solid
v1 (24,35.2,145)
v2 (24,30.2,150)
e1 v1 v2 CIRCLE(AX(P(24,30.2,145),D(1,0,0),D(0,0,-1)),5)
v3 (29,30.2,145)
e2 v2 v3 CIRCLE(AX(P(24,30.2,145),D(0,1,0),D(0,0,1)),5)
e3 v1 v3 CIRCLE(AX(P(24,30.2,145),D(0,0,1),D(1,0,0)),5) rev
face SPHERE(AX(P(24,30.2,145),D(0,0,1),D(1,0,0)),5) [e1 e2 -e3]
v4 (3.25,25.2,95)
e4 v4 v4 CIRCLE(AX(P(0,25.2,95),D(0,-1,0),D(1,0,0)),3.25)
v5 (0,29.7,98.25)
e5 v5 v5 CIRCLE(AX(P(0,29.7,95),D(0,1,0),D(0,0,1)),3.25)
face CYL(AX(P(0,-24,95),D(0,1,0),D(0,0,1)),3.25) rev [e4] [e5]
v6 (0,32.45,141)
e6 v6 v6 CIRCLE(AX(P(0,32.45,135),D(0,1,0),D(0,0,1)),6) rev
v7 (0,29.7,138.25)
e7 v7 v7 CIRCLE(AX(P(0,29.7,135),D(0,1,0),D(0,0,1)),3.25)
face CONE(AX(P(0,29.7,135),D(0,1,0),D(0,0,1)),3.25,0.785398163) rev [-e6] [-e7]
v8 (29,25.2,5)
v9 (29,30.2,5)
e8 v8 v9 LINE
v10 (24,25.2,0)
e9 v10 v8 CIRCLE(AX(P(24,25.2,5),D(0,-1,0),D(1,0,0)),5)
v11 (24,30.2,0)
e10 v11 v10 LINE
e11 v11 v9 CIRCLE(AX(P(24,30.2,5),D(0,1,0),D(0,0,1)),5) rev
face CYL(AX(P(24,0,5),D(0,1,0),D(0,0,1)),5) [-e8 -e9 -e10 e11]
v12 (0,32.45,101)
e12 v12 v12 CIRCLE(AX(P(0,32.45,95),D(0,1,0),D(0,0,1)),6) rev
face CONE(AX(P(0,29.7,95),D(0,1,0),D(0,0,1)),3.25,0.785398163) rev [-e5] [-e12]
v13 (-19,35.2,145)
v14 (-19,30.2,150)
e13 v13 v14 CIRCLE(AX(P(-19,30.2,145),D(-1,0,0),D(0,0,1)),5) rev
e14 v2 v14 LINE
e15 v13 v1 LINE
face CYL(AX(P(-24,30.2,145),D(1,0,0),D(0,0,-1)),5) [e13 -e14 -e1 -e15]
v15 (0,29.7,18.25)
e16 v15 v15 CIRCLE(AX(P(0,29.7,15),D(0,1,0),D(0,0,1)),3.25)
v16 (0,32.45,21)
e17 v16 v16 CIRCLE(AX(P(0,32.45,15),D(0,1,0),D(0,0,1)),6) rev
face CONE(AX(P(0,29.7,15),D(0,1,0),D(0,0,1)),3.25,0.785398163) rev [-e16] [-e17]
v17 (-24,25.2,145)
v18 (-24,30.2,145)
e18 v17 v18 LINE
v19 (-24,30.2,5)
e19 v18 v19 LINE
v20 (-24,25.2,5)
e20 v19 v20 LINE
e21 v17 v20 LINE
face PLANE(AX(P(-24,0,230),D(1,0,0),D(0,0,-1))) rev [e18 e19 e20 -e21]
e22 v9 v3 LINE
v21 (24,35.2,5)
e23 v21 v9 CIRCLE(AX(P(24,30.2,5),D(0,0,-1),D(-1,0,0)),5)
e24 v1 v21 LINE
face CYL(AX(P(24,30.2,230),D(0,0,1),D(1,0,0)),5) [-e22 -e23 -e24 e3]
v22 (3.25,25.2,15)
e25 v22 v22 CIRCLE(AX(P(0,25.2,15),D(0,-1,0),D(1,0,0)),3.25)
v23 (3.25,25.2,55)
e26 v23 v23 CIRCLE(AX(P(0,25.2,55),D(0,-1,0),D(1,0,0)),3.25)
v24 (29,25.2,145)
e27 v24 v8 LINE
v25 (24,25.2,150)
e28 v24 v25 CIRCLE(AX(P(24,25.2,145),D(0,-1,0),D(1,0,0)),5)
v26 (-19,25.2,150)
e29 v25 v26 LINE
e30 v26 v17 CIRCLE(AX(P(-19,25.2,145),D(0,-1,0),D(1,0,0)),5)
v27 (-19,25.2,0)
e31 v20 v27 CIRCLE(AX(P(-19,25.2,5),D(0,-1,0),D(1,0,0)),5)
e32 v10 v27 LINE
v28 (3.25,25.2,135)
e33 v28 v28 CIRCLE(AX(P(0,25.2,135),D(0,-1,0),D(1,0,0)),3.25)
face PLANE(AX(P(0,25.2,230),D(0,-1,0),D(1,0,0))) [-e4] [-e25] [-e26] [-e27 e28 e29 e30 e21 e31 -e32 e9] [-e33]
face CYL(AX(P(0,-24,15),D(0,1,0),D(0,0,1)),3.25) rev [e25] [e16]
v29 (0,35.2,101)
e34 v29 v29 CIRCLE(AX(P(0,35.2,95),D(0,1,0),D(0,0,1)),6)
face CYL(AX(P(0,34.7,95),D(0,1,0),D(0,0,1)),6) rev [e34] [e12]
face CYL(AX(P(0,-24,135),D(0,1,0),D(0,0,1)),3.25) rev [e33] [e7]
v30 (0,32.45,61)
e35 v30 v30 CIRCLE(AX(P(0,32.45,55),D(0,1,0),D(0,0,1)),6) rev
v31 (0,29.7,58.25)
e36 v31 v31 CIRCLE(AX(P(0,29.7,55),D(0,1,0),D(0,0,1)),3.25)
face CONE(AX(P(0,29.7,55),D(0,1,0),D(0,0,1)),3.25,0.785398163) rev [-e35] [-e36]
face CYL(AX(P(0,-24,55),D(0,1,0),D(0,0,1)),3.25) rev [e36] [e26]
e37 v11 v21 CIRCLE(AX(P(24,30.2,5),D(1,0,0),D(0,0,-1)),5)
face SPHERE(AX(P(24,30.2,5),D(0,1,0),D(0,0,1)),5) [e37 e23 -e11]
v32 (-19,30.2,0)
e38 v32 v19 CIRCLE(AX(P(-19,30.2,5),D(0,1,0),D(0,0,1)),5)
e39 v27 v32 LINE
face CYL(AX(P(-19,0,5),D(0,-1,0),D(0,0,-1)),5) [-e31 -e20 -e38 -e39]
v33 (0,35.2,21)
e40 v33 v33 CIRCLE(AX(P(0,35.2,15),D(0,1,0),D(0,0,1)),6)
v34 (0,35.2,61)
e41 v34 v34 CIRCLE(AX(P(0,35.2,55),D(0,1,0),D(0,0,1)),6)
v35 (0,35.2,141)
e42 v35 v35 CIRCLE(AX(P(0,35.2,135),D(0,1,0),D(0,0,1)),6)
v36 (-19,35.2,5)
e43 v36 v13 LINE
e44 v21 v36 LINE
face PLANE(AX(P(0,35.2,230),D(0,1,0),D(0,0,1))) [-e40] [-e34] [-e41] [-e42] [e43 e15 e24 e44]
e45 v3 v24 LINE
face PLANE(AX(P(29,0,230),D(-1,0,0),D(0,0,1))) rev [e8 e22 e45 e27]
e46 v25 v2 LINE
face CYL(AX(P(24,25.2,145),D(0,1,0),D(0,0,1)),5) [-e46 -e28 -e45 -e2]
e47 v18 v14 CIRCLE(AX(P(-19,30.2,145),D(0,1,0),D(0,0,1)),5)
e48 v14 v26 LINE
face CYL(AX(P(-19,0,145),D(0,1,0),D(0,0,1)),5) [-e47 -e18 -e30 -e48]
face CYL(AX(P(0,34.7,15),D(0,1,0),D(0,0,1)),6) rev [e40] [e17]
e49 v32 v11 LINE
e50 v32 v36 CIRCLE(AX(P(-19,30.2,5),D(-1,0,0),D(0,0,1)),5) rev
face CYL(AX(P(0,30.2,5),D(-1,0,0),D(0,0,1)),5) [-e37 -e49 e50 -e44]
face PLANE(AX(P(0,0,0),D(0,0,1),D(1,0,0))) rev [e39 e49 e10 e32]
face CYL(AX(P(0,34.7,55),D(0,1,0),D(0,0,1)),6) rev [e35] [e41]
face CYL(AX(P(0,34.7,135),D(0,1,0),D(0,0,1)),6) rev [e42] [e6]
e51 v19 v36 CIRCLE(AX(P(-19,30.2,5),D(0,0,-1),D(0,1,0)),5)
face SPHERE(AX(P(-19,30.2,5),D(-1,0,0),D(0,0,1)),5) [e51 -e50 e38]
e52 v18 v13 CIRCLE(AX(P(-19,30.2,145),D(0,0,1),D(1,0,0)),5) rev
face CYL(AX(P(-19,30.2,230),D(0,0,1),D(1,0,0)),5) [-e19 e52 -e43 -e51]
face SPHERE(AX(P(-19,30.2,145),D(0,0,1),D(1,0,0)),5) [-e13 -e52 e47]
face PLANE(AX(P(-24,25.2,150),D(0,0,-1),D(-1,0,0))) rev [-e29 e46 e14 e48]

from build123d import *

# Parameters (mm, degrees)
SKETCH1_W               = 48
SKETCH1_H               = 48
SKETCH1_R               = 13.75
SKETCH1_H_2             = 10
BOSS_EXTRUDE1_DEPTH     = 230
SKETCH3_R               = 6
CUT_EXTRUDE1_DEPTH      = 0.5
SKETCH4_R               = 3.25
CUT_EXTRUDE2_DEPTH      = 240.26061105
CUT_EXTRUDE3_REACH      = 241.261
CUT_EXTRUDE3_END_RADIUS = 13.75
SKETCH5_R               = 6.5
CUT_EXTRUDE4_REACH      = 243.738
CUT_EXTRUDE4_END_RADIUS = 13.75
CUT_EXTRUDE4_START      = -5
CHAMFER1_SIZE           = 5
SKETCH8_W               = 230
SKETCH8_H               = 1.2
CUT_EXTRUDE5_DEPTH      = 10
SKETCH9_W               = 53
SKETCH9_H               = 80
CUT_EXTRUDE6_DEPTH      = 233.036635039
FILLET2_R               = 5


with BuildPart() as part:
    # Sketch1 → Boss-Extrude1 (new body)
    # profile 1 of 3: a face of its own
    with BuildSketch(Plane.XY):
        Rectangle(SKETCH1_W, SKETCH1_H)
        Circle(SKETCH1_R, mode=Mode.SUBTRACT)
    # profile 2 of 3: a face of its own
    with BuildSketch(Plane.XY):
        with Locations((0, 30.2)):
            Rectangle(SKETCH1_W, SKETCH1_H_2)
    # profile 3 of 3: a face of its own
    with BuildSketch(Plane.XY):
        Polygon((24, 24), (24, -24), (29, -24), (29, 35.2), (24, 35.2), (24, 25.2), align=None)
    extrude(amount=BOSS_EXTRUDE1_DEPTH)

    # Sketch3 → Cut-Extrude1 (cut)
    with BuildSketch(Plane(origin=(0, 35.2, 0), x_dir=(1, 0, 0), z_dir=(0, 1, 0))):
        with Locations(Location((0, -15, 0), (0, 0, 270))):
            Circle(SKETCH3_R)
        with Locations(Location((0, -55, 0), (0, 0, 270))):
            Circle(SKETCH3_R)
        with Locations(Location((0, -95, 0), (0, 0, 270))):
            Circle(SKETCH3_R)
        with Locations(Location((0, -135, 0), (0, 0, 270))):
            Circle(SKETCH3_R)
        with Locations(Location((0, -175, 0), (0, 0, 270))):
            Circle(SKETCH3_R)
        with Locations(Location((0, -215, 0), (0, 0, 270))):
            Circle(SKETCH3_R)
    extrude(amount=-CUT_EXTRUDE1_DEPTH, mode=Mode.SUBTRACT)

    # Sketch4 → Cut-Extrude2 (cut, through all)
    with BuildSketch(Plane(origin=(0, 35.2, 0), x_dir=(1, 0, 0), z_dir=(0, 1, 0))):
        with Locations(Location((0, -15, 0), (0, 0, 270))):
            Circle(SKETCH4_R)
        with Locations(Location((0, -55, 0), (0, 0, 270))):
            Circle(SKETCH4_R)
        with Locations(Location((0, -95, 0), (0, 0, 270))):
            Circle(SKETCH4_R)
        with Locations(Location((0, -135, 0), (0, 0, 270))):
            Circle(SKETCH4_R)
        with Locations(Location((0, -175, 0), (0, 0, 270))):
            Circle(SKETCH4_R)
        with Locations(Location((0, -215, 0), (0, 0, 270))):
            Circle(SKETCH4_R)
    extrude(amount=-CUT_EXTRUDE2_DEPTH, mode=Mode.SUBTRACT)

    # Cut-Extrude3: up to this cylinder (the profile starts outside it)
    cut_extrude3_end = Plane(origin=(0, 0, 115), z_dir=(0, 0, -1)) * Cylinder(CUT_EXTRUDE3_END_RADIUS, 711.022, mode=Mode.PRIVATE)
    # Sketch5 → Cut-Extrude3 (cut, up to the surface)
    with BuildSketch(Plane.XZ.offset(24), mode=Mode.PRIVATE) as cut_extrude3_sk1:
        with Locations(Location((0, 215, 0), (0, 0, 270))):
            Circle(SKETCH5_R)
    cut_extrude3_tool1 = extrude(cut_extrude3_sk1.sketch, amount=-CUT_EXTRUDE3_REACH, mode=Mode.PRIVATE) - cut_extrude3_end
    add(cut_extrude3_tool1.solids().sort_by_distance((0, -24, 215))[0], mode=Mode.SUBTRACT)
    # Sketch5 → Cut-Extrude3 (cut, up to the surface)
    with BuildSketch(Plane.XZ.offset(24), mode=Mode.PRIVATE) as cut_extrude3_sk2:
        with Locations(Location((0, 175, 0), (0, 0, 270))):
            Circle(SKETCH5_R)
    cut_extrude3_tool2 = extrude(cut_extrude3_sk2.sketch, amount=-CUT_EXTRUDE3_REACH, mode=Mode.PRIVATE) - cut_extrude3_end
    add(cut_extrude3_tool2.solids().sort_by_distance((0, -24, 175))[0], mode=Mode.SUBTRACT)
    # Sketch5 → Cut-Extrude3 (cut, up to the surface)
    with BuildSketch(Plane.XZ.offset(24), mode=Mode.PRIVATE) as cut_extrude3_sk3:
        with Locations(Location((0, 135, 0), (0, 0, 270))):
            Circle(SKETCH5_R)
    cut_extrude3_tool3 = extrude(cut_extrude3_sk3.sketch, amount=-CUT_EXTRUDE3_REACH, mode=Mode.PRIVATE) - cut_extrude3_end
    add(cut_extrude3_tool3.solids().sort_by_distance((0, -24, 135))[0], mode=Mode.SUBTRACT)
    # Sketch5 → Cut-Extrude3 (cut, up to the surface)
    with BuildSketch(Plane.XZ.offset(24), mode=Mode.PRIVATE) as cut_extrude3_sk4:
        with Locations(Location((0, 95, 0), (0, 0, 270))):
            Circle(SKETCH5_R)
    cut_extrude3_tool4 = extrude(cut_extrude3_sk4.sketch, amount=-CUT_EXTRUDE3_REACH, mode=Mode.PRIVATE) - cut_extrude3_end
    add(cut_extrude3_tool4.solids().sort_by_distance((0, -24, 95))[0], mode=Mode.SUBTRACT)
    # Sketch5 → Cut-Extrude3 (cut, up to the surface)
    with BuildSketch(Plane.XZ.offset(24), mode=Mode.PRIVATE) as cut_extrude3_sk5:
        with Locations(Location((0, 55, 0), (0, 0, 270))):
            Circle(SKETCH5_R)
    cut_extrude3_tool5 = extrude(cut_extrude3_sk5.sketch, amount=-CUT_EXTRUDE3_REACH, mode=Mode.PRIVATE) - cut_extrude3_end
    add(cut_extrude3_tool5.solids().sort_by_distance((0, -24, 55))[0], mode=Mode.SUBTRACT)
    # Sketch5 → Cut-Extrude3 (cut, up to the surface)
    with BuildSketch(Plane.XZ.offset(24), mode=Mode.PRIVATE) as cut_extrude3_sk6:
        with Locations(Location((0, 15, 0), (0, 0, 270))):
            Circle(SKETCH5_R)
    cut_extrude3_tool6 = extrude(cut_extrude3_sk6.sketch, amount=-CUT_EXTRUDE3_REACH, mode=Mode.PRIVATE) - cut_extrude3_end
    add(cut_extrude3_tool6.solids().sort_by_distance((0, -24, 15))[0], mode=Mode.SUBTRACT)

    # Cut-Extrude4: up to this cylinder (the profile starts outside it)
    cut_extrude4_end = Plane(origin=(0, 0, 115), z_dir=(0, 0, -1)) * Cylinder(CUT_EXTRUDE4_END_RADIUS, 715.976, mode=Mode.PRIVATE)
    # Sketch7 → Cut-Extrude4 (cut, up to the surface)
    with BuildSketch(Plane(origin=(0, 24, 0), x_dir=(1, 0, 0), z_dir=(0, 1, 0)).offset(CUT_EXTRUDE4_START), mode=Mode.PRIVATE) as cut_extrude4_sk1:
        Polygon((0, -8.533676985), (-5.6, -11.766838493), (-5.6, -18.233161507), (0, -21.466323015), (5.6, -18.233161507), (5.6, -11.766838493), align=None)
    cut_extrude4_tool1 = extrude(cut_extrude4_sk1.sketch, amount=-CUT_EXTRUDE4_REACH, mode=Mode.PRIVATE) - cut_extrude4_end
    add(cut_extrude4_tool1.solids().sort_by_distance((0, 19, 15))[0], mode=Mode.SUBTRACT)
    # Sketch7 → Cut-Extrude4 (cut, up to the surface)
    with BuildSketch(Plane(origin=(0, 24, 0), x_dir=(1, 0, 0), z_dir=(0, 1, 0)).offset(CUT_EXTRUDE4_START), mode=Mode.PRIVATE) as cut_extrude4_sk2:
        Polygon((0, -48.533676985), (-5.6, -51.766838493), (-5.6, -58.233161507), (0, -61.466323015), (5.6, -58.233161507), (5.6, -51.766838493), align=None)
    cut_extrude4_tool2 = extrude(cut_extrude4_sk2.sketch, amount=-CUT_EXTRUDE4_REACH, mode=Mode.PRIVATE) - cut_extrude4_end
    add(cut_extrude4_tool2.solids().sort_by_distance((0, 19, 55))[0], mode=Mode.SUBTRACT)
    # Sketch7 → Cut-Extrude4 (cut, up to the surface)
    with BuildSketch(Plane(origin=(0, 24, 0), x_dir=(1, 0, 0), z_dir=(0, 1, 0)).offset(CUT_EXTRUDE4_START), mode=Mode.PRIVATE) as cut_extrude4_sk3:
        Polygon((0, -88.533676985), (-5.6, -91.766838493), (-5.6, -98.233161507), (0, -101.466323015), (5.6, -98.233161507), (5.6, -91.766838493), align=None)
    cut_extrude4_tool3 = extrude(cut_extrude4_sk3.sketch, amount=-CUT_EXTRUDE4_REACH, mode=Mode.PRIVATE) - cut_extrude4_end
    add(cut_extrude4_tool3.solids().sort_by_distance((0, 19, 95))[0], mode=Mode.SUBTRACT)
    # Sketch7 → Cut-Extrude4 (cut, up to the surface)
    with BuildSketch(Plane(origin=(0, 24, 0), x_dir=(1, 0, 0), z_dir=(0, 1, 0)).offset(CUT_EXTRUDE4_START), mode=Mode.PRIVATE) as cut_extrude4_sk4:
        Polygon((0, -128.533676985), (-5.6, -131.766838493), (-5.6, -138.233161507), (0, -141.466323015), (5.6, -138.233161507), (5.6, -131.766838493), align=None)
    cut_extrude4_tool4 = extrude(cut_extrude4_sk4.sketch, amount=-CUT_EXTRUDE4_REACH, mode=Mode.PRIVATE) - cut_extrude4_end
    add(cut_extrude4_tool4.solids().sort_by_distance((0, 19, 135))[0], mode=Mode.SUBTRACT)
    # Sketch7 → Cut-Extrude4 (cut, up to the surface)
    with BuildSketch(Plane(origin=(0, 24, 0), x_dir=(1, 0, 0), z_dir=(0, 1, 0)).offset(CUT_EXTRUDE4_START), mode=Mode.PRIVATE) as cut_extrude4_sk5:
        Polygon((0, -168.533676985), (-5.6, -171.766838493), (-5.6, -178.233161507), (0, -181.466323015), (5.6, -178.233161507), (5.6, -171.766838493), align=None)
    cut_extrude4_tool5 = extrude(cut_extrude4_sk5.sketch, amount=-CUT_EXTRUDE4_REACH, mode=Mode.PRIVATE) - cut_extrude4_end
    add(cut_extrude4_tool5.solids().sort_by_distance((0, 19, 175))[0], mode=Mode.SUBTRACT)
    # Sketch7 → Cut-Extrude4 (cut, up to the surface)
    with BuildSketch(Plane(origin=(0, 24, 0), x_dir=(1, 0, 0), z_dir=(0, 1, 0)).offset(CUT_EXTRUDE4_START), mode=Mode.PRIVATE) as cut_extrude4_sk6:
        Polygon((0, -208.533676985), (-5.6, -211.766838493), (-5.6, -218.233161507), (0, -221.466323015), (5.6, -218.233161507), (5.6, -211.766838493), align=None)
    cut_extrude4_tool6 = extrude(cut_extrude4_sk6.sketch, amount=-CUT_EXTRUDE4_REACH, mode=Mode.PRIVATE) - cut_extrude4_end
    add(cut_extrude4_tool6.solids().sort_by_distance((0, 19, 215))[0], mode=Mode.SUBTRACT)

    # Chamfer1
    # the kernel refuses this chamfer: 5 mm, written as the material it takes off along each edge
    with BuildSketch(Plane(origin=(0, 34.7, 215), x_dir=(0, 0, 1), z_dir=(-1, 0, 0))) as chamfer1_piece_1_section:
        Polygon((3.25, -CHAMFER1_SIZE), (3.25 + CHAMFER1_SIZE, 0), (3.25, 0), align=None)
    chamfer1_piece_1 = revolve(axis=Axis((0, 34.7, 215), (0, 1, 0)), mode=Mode.PRIVATE)
    chamfer1_piece_1 = chamfer1_piece_1 & Plane(origin=(0, 31.051548399, 215), x_dir=(0, 0, 1), z_dir=(0, 1, 0)) * Cylinder(6, 33, mode=Mode.PRIVATE)
    add(chamfer1_piece_1, mode=Mode.SUBTRACT)
    with BuildSketch(Plane(origin=(0, 34.7, 175), x_dir=(0, 0, 1), z_dir=(-1, 0, 0))) as chamfer1_piece_2_section:
        Polygon((3.25, -CHAMFER1_SIZE), (3.25 + CHAMFER1_SIZE, 0), (3.25, 0), align=None)
    chamfer1_piece_2 = revolve(axis=Axis((0, 34.7, 175), (0, 1, 0)), mode=Mode.PRIVATE)
    chamfer1_piece_2 = chamfer1_piece_2 & Plane(origin=(0, 31.051548399, 175), x_dir=(0, 0, 1), z_dir=(0, 1, 0)) * Cylinder(6, 33, mode=Mode.PRIVATE)
    add(chamfer1_piece_2, mode=Mode.SUBTRACT)
    with BuildSketch(Plane(origin=(0, 34.7, 135), x_dir=(0, 0, 1), z_dir=(-1, 0, 0))) as chamfer1_piece_3_section:
        Polygon((3.25, -CHAMFER1_SIZE), (3.25 + CHAMFER1_SIZE, 0), (3.25, 0), align=None)
    chamfer1_piece_3 = revolve(axis=Axis((0, 34.7, 135), (0, 1, 0)), mode=Mode.PRIVATE)
    chamfer1_piece_3 = chamfer1_piece_3 & Plane(origin=(0, 31.051548399, 135), x_dir=(0, 0, 1), z_dir=(0, 1, 0)) * Cylinder(6, 33, mode=Mode.PRIVATE)
    add(chamfer1_piece_3, mode=Mode.SUBTRACT)
    with BuildSketch(Plane(origin=(0, 34.7, 95), x_dir=(0, 0, 1), z_dir=(-1, 0, 0))) as chamfer1_piece_4_section:
        Polygon((3.25, -CHAMFER1_SIZE), (3.25 + CHAMFER1_SIZE, 0), (3.25, 0), align=None)
    chamfer1_piece_4 = revolve(axis=Axis((0, 34.7, 95), (0, 1, 0)), mode=Mode.PRIVATE)
    chamfer1_piece_4 = chamfer1_piece_4 & Plane(origin=(0, 31.051548399, 95), x_dir=(0, 0, 1), z_dir=(0, 1, 0)) * Cylinder(6, 33, mode=Mode.PRIVATE)
    add(chamfer1_piece_4, mode=Mode.SUBTRACT)
    with BuildSketch(Plane(origin=(0, 34.7, 55), x_dir=(0, 0, 1), z_dir=(-1, 0, 0))) as chamfer1_piece_5_section:
        Polygon((3.25, -CHAMFER1_SIZE), (3.25 + CHAMFER1_SIZE, 0), (3.25, 0), align=None)
    chamfer1_piece_5 = revolve(axis=Axis((0, 34.7, 55), (0, 1, 0)), mode=Mode.PRIVATE)
    chamfer1_piece_5 = chamfer1_piece_5 & Plane(origin=(0, 31.051548399, 55), x_dir=(0, 0, 1), z_dir=(0, 1, 0)) * Cylinder(6, 33, mode=Mode.PRIVATE)
    add(chamfer1_piece_5, mode=Mode.SUBTRACT)
    with BuildSketch(Plane(origin=(0, 34.7, 15), x_dir=(0, 0, 1), z_dir=(-1, 0, 0))) as chamfer1_piece_6_section:
        Polygon((3.25, -CHAMFER1_SIZE), (3.25 + CHAMFER1_SIZE, 0), (3.25, 0), align=None)
    chamfer1_piece_6 = revolve(axis=Axis((0, 34.7, 15), (0, 1, 0)), mode=Mode.PRIVATE)
    chamfer1_piece_6 = chamfer1_piece_6 & Plane(origin=(0, 31.051548399, 15), x_dir=(0, 0, 1), z_dir=(0, 1, 0)) * Cylinder(6, 33, mode=Mode.PRIVATE)
    add(chamfer1_piece_6, mode=Mode.SUBTRACT)

    # Sketch8 → Cut-Extrude5 (cut)
    with BuildSketch(Plane.ZY.offset(-24)):
        with Locations((115, 24.6)):
            Rectangle(SKETCH8_W, SKETCH8_H)
    extrude(amount=-CUT_EXTRUDE5_DEPTH, mode=Mode.SUBTRACT)


with BuildPart() as body_2:
    # of the pieces the cut leaves, the one that is kept (cut_extrude5_keep)
    add(part.part.solids().sort_by_distance((29, 25.2, 0))[0])

    # Sketch9 → Cut-Extrude6 (cut, through all)
    with BuildSketch(Plane(origin=(0, 35.2, 0), x_dir=(1, 0, 0), z_dir=(0, 1, 0))):
        with Locations((2.5, -190)):
            Rectangle(SKETCH9_W, SKETCH9_H)
    extrude(amount=-CUT_EXTRUDE6_DEPTH, mode=Mode.SUBTRACT)

    # Fillet2
    fillet2_edges = [body_2.edges().sort_by_distance(p)[0] for p in [
        (29, 30.2, 0),
        (-24, 30.2, 0),
        (2.5, 35.2, 0),
        (-24, 35.2, 75),
        (29, 35.2, 75),
        (2.5, 35.2, 150),
        (-24, 30.2, 150),
        (29, 30.2, 150),
    ]]
    fillet(fillet2_edges, radius=FILLET2_R)


solid = body_2.part
